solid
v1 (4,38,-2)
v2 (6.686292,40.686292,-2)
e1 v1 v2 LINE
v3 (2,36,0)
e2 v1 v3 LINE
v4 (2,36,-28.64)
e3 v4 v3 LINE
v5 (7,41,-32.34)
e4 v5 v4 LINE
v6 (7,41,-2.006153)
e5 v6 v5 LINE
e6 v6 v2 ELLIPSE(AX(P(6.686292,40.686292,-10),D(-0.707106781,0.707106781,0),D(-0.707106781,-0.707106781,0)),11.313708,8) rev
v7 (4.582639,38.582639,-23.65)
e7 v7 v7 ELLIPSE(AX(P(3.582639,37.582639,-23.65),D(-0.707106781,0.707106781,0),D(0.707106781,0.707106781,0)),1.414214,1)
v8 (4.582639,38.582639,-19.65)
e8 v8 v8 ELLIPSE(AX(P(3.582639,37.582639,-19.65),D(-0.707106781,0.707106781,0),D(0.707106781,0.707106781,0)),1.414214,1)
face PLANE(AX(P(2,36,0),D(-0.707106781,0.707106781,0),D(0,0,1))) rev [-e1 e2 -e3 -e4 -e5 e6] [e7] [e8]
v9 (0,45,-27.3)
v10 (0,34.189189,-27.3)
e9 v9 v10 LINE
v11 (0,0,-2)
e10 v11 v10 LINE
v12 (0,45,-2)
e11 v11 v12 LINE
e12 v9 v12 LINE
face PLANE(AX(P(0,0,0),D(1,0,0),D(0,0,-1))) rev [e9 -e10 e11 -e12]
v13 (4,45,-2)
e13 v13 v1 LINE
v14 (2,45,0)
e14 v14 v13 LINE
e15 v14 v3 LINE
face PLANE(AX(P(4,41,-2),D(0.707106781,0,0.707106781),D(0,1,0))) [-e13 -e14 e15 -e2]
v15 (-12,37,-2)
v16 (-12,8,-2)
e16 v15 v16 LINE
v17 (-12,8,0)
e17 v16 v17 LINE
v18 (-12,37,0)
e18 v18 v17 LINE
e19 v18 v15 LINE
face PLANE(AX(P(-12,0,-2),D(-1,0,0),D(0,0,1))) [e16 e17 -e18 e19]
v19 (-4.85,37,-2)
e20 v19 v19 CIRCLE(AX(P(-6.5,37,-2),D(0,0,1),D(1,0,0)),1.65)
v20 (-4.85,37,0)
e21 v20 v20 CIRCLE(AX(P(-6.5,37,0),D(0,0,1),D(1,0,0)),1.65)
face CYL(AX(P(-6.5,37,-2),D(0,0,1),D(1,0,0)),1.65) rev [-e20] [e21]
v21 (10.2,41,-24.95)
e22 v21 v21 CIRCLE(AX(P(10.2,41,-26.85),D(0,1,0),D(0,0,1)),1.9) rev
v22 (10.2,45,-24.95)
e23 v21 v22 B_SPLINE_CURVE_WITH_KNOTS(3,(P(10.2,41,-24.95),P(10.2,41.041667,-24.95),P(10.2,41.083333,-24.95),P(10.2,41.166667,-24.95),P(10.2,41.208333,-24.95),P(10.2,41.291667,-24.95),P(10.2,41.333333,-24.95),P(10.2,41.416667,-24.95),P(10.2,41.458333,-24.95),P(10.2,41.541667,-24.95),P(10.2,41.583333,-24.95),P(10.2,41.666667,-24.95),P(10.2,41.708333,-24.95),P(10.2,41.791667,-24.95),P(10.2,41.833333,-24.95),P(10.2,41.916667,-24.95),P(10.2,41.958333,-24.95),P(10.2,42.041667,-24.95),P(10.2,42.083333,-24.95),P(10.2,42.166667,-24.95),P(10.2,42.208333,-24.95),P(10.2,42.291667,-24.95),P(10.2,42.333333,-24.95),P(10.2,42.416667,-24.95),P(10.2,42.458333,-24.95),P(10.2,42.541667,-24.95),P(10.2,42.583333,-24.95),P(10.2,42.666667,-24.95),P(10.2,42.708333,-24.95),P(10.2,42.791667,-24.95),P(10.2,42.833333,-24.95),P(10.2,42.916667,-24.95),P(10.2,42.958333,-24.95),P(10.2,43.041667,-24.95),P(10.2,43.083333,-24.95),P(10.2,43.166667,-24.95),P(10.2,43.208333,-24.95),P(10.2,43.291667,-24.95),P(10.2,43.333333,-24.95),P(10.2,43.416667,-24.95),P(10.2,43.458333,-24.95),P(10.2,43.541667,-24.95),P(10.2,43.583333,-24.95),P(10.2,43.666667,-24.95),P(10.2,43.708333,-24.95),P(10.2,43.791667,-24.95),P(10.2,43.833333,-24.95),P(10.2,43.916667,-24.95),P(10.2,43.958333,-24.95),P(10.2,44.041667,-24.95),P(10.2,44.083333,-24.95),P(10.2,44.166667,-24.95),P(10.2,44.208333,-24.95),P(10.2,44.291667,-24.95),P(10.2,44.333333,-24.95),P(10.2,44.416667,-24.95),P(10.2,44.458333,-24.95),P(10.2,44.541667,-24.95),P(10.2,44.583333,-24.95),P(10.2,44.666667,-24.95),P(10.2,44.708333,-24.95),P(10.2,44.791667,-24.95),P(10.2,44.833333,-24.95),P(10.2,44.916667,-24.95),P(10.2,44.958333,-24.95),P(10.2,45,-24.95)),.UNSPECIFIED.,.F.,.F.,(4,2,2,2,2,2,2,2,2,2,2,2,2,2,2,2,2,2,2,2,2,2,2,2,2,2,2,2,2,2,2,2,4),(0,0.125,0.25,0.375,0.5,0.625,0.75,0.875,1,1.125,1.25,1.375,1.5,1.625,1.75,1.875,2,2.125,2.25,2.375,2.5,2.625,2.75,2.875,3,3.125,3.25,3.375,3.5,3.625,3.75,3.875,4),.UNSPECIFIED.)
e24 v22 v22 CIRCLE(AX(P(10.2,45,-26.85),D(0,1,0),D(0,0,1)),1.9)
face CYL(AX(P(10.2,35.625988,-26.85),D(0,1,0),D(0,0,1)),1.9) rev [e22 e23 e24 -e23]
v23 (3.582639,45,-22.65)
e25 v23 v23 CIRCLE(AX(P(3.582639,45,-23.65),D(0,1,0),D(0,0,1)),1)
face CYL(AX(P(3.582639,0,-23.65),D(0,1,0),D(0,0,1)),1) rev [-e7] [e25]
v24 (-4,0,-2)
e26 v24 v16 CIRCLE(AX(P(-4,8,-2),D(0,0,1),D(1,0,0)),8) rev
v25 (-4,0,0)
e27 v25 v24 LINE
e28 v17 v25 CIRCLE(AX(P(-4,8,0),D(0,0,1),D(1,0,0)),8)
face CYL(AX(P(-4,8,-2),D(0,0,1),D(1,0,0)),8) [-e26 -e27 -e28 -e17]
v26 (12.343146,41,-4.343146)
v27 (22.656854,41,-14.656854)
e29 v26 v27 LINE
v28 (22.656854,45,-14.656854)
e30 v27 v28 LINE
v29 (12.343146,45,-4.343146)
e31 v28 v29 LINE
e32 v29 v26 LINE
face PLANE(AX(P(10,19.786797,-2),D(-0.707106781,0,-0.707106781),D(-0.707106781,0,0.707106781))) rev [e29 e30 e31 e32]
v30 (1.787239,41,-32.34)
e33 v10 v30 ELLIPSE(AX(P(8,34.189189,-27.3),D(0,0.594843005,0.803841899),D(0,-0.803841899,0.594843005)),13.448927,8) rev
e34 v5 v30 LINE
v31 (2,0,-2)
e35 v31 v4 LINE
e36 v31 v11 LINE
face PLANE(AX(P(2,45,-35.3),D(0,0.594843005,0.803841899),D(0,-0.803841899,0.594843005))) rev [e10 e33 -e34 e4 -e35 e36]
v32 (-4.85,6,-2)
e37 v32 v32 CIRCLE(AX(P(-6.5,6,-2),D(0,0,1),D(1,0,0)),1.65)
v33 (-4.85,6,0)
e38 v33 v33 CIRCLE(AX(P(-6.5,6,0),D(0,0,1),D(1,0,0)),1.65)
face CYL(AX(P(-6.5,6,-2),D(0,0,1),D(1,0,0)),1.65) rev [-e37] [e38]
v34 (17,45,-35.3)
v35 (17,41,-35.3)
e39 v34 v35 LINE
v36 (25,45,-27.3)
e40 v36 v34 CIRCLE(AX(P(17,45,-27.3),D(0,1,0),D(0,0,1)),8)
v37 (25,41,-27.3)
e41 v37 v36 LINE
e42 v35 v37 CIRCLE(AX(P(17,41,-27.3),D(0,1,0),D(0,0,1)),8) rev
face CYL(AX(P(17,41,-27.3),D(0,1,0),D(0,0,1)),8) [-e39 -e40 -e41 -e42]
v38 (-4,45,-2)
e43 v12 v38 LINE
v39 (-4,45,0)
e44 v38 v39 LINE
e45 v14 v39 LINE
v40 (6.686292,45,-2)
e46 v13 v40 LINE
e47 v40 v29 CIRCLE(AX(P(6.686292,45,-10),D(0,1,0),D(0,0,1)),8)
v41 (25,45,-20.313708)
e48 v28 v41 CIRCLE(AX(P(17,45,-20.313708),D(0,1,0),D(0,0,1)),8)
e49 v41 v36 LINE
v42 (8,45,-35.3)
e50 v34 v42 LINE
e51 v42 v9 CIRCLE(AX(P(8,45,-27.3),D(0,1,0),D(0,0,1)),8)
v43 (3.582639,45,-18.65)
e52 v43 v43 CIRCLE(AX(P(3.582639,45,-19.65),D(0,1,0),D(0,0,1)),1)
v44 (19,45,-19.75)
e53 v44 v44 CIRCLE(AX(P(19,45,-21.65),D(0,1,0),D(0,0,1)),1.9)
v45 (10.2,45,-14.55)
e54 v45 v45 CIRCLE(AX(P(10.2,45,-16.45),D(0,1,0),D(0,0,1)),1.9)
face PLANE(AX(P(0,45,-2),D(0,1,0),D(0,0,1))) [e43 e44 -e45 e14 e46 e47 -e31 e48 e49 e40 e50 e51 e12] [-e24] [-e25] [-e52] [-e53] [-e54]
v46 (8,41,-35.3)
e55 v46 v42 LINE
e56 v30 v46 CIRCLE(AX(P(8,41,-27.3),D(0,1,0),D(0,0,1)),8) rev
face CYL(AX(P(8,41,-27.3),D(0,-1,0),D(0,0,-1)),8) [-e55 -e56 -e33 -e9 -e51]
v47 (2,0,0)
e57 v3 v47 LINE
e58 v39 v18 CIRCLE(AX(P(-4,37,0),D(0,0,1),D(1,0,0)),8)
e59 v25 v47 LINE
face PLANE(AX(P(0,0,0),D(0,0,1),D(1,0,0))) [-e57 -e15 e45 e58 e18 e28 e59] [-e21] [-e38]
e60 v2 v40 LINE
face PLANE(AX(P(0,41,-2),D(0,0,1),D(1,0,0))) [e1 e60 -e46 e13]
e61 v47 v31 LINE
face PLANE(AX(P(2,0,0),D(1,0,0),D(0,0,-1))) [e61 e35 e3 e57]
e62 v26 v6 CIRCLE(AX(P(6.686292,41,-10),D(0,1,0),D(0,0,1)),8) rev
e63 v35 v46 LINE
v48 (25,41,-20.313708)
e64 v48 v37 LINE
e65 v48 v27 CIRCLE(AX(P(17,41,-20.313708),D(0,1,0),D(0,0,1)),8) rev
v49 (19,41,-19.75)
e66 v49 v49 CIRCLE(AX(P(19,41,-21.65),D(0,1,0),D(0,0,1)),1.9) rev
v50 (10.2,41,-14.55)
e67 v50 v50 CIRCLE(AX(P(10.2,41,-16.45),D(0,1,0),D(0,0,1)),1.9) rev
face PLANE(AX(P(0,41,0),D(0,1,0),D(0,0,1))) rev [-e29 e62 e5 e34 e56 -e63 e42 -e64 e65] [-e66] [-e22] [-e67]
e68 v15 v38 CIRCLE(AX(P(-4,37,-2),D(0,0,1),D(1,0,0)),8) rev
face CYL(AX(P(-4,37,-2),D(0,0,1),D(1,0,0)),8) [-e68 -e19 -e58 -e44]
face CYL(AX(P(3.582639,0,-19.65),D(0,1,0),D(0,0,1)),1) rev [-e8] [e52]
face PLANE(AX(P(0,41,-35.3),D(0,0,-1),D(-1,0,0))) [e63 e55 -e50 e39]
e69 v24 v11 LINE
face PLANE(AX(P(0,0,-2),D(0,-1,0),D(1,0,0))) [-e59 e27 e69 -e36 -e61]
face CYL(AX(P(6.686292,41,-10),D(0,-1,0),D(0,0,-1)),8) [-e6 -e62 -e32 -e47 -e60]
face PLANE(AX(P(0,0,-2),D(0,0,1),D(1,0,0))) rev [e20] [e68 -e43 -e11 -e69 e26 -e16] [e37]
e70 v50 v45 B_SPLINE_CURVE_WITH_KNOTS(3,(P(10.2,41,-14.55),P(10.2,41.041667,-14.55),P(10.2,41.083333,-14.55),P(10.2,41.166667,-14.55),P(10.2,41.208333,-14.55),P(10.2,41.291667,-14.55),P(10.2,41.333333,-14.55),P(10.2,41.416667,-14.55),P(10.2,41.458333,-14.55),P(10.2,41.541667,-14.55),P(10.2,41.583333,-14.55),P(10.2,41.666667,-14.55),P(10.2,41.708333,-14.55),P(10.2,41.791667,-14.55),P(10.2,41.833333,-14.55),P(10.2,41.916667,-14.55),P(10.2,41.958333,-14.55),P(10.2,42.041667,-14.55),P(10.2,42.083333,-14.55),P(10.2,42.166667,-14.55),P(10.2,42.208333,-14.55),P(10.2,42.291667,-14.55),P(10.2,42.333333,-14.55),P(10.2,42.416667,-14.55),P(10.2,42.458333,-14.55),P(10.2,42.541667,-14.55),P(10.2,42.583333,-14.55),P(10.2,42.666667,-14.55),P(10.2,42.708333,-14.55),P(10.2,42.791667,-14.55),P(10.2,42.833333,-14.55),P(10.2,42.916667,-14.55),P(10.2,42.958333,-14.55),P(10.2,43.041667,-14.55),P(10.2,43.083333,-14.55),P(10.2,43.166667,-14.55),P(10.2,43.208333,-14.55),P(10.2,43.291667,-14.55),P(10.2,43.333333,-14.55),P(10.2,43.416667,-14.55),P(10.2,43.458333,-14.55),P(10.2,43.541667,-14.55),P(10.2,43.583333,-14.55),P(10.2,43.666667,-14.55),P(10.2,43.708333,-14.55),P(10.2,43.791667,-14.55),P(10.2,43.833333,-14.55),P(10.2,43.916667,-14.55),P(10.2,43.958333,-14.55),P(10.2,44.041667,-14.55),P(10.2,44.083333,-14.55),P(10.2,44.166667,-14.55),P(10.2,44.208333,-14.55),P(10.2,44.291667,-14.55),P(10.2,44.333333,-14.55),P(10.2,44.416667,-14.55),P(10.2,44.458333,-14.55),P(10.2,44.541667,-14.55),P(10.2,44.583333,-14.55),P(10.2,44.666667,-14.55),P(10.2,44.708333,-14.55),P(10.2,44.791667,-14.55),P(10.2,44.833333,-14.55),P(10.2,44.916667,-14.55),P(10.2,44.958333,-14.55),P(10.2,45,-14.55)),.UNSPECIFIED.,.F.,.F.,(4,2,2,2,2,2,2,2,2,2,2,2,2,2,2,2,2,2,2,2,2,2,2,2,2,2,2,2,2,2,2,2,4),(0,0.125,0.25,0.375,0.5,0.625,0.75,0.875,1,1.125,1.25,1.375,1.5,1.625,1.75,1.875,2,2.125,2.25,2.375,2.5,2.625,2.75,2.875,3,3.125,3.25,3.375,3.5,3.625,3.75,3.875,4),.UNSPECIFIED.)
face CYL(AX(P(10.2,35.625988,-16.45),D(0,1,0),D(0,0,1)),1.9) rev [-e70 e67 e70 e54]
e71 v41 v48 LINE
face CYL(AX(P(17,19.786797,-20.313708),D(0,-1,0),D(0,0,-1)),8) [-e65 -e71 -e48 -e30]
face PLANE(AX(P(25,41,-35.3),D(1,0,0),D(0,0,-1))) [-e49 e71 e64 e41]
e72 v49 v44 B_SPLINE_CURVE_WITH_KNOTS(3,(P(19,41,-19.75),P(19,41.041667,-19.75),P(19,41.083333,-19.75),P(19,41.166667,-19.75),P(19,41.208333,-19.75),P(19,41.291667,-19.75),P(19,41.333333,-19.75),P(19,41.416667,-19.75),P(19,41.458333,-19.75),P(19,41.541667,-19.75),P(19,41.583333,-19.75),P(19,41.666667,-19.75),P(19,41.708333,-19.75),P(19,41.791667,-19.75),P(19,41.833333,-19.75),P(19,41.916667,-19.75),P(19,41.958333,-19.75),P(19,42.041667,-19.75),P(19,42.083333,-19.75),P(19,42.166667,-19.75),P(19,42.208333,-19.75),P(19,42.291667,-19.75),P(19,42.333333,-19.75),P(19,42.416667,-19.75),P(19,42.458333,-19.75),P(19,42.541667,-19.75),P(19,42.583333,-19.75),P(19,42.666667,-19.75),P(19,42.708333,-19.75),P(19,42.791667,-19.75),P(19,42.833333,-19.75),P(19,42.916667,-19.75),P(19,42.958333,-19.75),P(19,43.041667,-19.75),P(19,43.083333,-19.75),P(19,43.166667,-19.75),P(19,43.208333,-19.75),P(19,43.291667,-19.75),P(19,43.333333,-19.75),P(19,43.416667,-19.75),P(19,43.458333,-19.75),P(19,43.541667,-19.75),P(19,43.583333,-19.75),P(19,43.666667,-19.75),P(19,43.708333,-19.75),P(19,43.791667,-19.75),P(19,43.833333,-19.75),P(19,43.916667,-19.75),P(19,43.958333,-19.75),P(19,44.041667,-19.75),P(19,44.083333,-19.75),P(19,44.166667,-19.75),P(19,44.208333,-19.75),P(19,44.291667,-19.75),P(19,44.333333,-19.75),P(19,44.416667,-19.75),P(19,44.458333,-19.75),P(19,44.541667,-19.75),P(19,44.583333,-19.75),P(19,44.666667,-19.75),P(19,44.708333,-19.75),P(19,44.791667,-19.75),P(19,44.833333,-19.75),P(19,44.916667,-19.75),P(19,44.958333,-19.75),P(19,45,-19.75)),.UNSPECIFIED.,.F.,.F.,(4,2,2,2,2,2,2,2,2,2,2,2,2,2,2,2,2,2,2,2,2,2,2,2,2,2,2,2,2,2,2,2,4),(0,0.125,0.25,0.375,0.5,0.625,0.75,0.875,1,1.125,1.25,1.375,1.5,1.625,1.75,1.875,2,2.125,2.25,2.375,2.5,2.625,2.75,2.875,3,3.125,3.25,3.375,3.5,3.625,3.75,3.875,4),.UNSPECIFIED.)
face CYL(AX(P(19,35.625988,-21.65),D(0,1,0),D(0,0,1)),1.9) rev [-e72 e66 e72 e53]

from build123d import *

# Parameters (mm, degrees)
SKETCH1_R           = 1.6500000000000001
SKETCH1_R_2         = 1.6500000000000006
BOSS_EXTRUDE1_DEPTH = 2
BOSS_EXTRUDE2_DEPTH = 2
BOSS_EXTRUDE3_DEPTH = 4
SKETCH4_R           = 1.8999999999999948
SKETCH4_R_2         = 1.8999999999999964
SKETCH4_R_3         = 1.8999999999999981
CUT_EXTRUDE1_DEPTH  = 4
SKETCH5_R           = 1.0000000000000009
SKETCH5_R_2         = 1
SKETCH5_R_3         = 1.8999999999999981
CUT_EXTRUDE2_DEPTH  = 63.418667079648536
CUT_EXTRUDE3_DEPTH  = 4
CHAMFER1_SIZE       = 5
CHAMFER2_SIZE       = 2
FILLET1_R           = 8
FILLET2_R           = 8
FILLET3_R           = 8


# Some blends are built 0.0001 mm under size
with BuildPart() as part:
    # Sketch1 → Boss-Extrude1 (new body)
    with BuildSketch(Plane.XY):
        Polygon((0, 0), (-12, -1.47e-15), (-12, 45), (0, 45), align=None)
        with Locations((-6.499999999999999, 37)):
            Circle(SKETCH1_R, mode=Mode.SUBTRACT)
        with Locations((-6.5000000000000036, 5.999999999999999)):
            Circle(SKETCH1_R_2, mode=Mode.SUBTRACT)
    extrude(amount=-BOSS_EXTRUDE1_DEPTH)

    # Sketch2 → Boss-Extrude2 (add)
    with BuildSketch(Plane(origin=(0, 0, 0), x_dir=(0, 0, -1), z_dir=(1, 0, 0))):
        Polygon((35.3, 45), (2, 0), (5.51e-15, 0), (0, 45), align=None)
    extrude(amount=BOSS_EXTRUDE2_DEPTH)

    # Sketch3 → Boss-Extrude3 (add)
    with BuildSketch(Plane(origin=(0, 45, 0), x_dir=(1, 0, 0), z_dir=(0, 1, 0))):
        Polygon((-6.1e-16, 35.3), (25, 35.3), (25.000000000000004, 1.9999999999999991), (3.47e-15, 1.9999999999999991), align=None)
    extrude(amount=-BOSS_EXTRUDE3_DEPTH)

    # Sketch4 → Cut-Extrude1 (cut)
    with BuildSketch(Plane(origin=(0, 45, 0), x_dir=(1, 0, 0), z_dir=(0, 1, 0))):
        with Locations(Location((10.199999999999998, 26.849999999999998, 0), (0, 0, 270))):
            Circle(SKETCH4_R)
        with Locations(Location((10.2, 16.45, 0), (0, 0, 270))):
            Circle(SKETCH4_R_2)
        with Locations(Location((18.999999999999996, 21.65, 0), (0, 0, 270))):
            Circle(SKETCH4_R_3)
    extrude(amount=-CUT_EXTRUDE1_DEPTH, mode=Mode.SUBTRACT)

    # Sketch5 → Cut-Extrude2 (cut, through all)
    with BuildSketch(Plane(origin=(0, 45, 0), x_dir=(1, 0, 0), z_dir=(0, 1, 0))):
        with Locations(Location((3.5826389249908894, 23.65, 0), (0, 0, 270))):
            Circle(SKETCH5_R)
        with Locations(Location((3.5826389249908894, 19.650000000000002, 0), (0, 0, 270))):
            Circle(SKETCH5_R_2)
        with Locations(Location((18.999999999999996, 21.65, 0), (0, 0, 270))):
            Circle(SKETCH5_R_3)
    extrude(amount=-CUT_EXTRUDE2_DEPTH, mode=Mode.SUBTRACT)

    # Sketch6 → Cut-Extrude3 (cut)
    with BuildSketch(Plane(origin=(0, 45, 0), x_dir=(1, 0, 0), z_dir=(0, 1, 0))):
        Polygon((10.000000000000005, 1.9999999999999991), (25.000000000000004, 16.99999999999984), (25.000000000000004, 1.9999999999999991), align=None)
    extrude(amount=-CUT_EXTRUDE3_DEPTH, mode=Mode.SUBTRACT)

    # Chamfer1
    # the kernel refuses this chamfer: 5 mm, written as the material it adds along each edge
    with BuildSketch(Plane(origin=(2, 41, -45.19841493982955), x_dir=(-0.02749587661058636, -0.9996219169112968, 0), z_dir=(0, 0, 1))) as chamfer1_piece_1_section:
        Polygon((CHAMFER1_SIZE * 0.999621916911, CHAMFER1_SIZE * 0.0274958766106), (-CHAMFER1_SIZE * 0.0274958766106, CHAMFER1_SIZE * 0.999621916911), (0, 0), align=None)
    chamfer1_piece_1 = extrude(amount=43.19841493982955, mode=Mode.PRIVATE)
    chamfer1_piece_1 = split(chamfer1_piece_1, bisect_by=Plane(origin=(3.679771833975431, 32.284665683470884, -25.89065260576845), z_dir=(0, 0.5948430054102947, 0.8038418992031009)), keep=Keep.TOP, mode=Mode.PRIVATE)
    chamfer1_piece_1 = chamfer1_piece_1 - Plane(origin=(3.5826389249908894, 39.396771086693036, -19.650000000000002), x_dir=(-1.8e-16, 0, 1), z_dir=(0, 1, 0)) * Cylinder(1, 107, mode=Mode.PRIVATE)
    chamfer1_piece_1 = chamfer1_piece_1 - Plane(origin=(3.5826389249908894, 39.396771086693036, -23.65), x_dir=(-1.8e-16, 0, 1), z_dir=(0, 1, 0)) * Cylinder(1.0000000000000009, 107, mode=Mode.PRIVATE)
    add(chamfer1_piece_1)

    # Chamfer2
    chamfer2_edges = [part.edges().sort_by_distance(p)[0] for p in [
        (1.9999999999990004, 40.50000000000074, -1.9999999999999996),
    ]]
    chamfer(chamfer2_edges, length=CHAMFER2_SIZE - 0.0001)  # a hair under: the kernel refuses the full size

    # Fillet1
    fillet1_edges = [part.edges().sort_by_distance(p)[0] for p in [
        (-12, -1.47e-15, -1),
        (-12, 45, -1),
    ]]
    fillet(fillet1_edges, radius=FILLET1_R)

    # Fillet2
    fillet2_edges = [part.edges().sort_by_distance(p)[0] for p in [
        (-6.1e-16, 43, -35.3),
        (25, 43, -35.3),
    ]]
    fillet(fillet2_edges, radius=FILLET2_R)

    # Fillet3
    fillet3_edges = [part.edges().sort_by_distance(p)[0] for p in [
        (10.000000000000005, 43, -1.9999999999999991),
        (25.000000000000004, 43, -16.99999999999984),
    ]]
    fillet(fillet3_edges, radius=FILLET3_R)


solid = part.part
